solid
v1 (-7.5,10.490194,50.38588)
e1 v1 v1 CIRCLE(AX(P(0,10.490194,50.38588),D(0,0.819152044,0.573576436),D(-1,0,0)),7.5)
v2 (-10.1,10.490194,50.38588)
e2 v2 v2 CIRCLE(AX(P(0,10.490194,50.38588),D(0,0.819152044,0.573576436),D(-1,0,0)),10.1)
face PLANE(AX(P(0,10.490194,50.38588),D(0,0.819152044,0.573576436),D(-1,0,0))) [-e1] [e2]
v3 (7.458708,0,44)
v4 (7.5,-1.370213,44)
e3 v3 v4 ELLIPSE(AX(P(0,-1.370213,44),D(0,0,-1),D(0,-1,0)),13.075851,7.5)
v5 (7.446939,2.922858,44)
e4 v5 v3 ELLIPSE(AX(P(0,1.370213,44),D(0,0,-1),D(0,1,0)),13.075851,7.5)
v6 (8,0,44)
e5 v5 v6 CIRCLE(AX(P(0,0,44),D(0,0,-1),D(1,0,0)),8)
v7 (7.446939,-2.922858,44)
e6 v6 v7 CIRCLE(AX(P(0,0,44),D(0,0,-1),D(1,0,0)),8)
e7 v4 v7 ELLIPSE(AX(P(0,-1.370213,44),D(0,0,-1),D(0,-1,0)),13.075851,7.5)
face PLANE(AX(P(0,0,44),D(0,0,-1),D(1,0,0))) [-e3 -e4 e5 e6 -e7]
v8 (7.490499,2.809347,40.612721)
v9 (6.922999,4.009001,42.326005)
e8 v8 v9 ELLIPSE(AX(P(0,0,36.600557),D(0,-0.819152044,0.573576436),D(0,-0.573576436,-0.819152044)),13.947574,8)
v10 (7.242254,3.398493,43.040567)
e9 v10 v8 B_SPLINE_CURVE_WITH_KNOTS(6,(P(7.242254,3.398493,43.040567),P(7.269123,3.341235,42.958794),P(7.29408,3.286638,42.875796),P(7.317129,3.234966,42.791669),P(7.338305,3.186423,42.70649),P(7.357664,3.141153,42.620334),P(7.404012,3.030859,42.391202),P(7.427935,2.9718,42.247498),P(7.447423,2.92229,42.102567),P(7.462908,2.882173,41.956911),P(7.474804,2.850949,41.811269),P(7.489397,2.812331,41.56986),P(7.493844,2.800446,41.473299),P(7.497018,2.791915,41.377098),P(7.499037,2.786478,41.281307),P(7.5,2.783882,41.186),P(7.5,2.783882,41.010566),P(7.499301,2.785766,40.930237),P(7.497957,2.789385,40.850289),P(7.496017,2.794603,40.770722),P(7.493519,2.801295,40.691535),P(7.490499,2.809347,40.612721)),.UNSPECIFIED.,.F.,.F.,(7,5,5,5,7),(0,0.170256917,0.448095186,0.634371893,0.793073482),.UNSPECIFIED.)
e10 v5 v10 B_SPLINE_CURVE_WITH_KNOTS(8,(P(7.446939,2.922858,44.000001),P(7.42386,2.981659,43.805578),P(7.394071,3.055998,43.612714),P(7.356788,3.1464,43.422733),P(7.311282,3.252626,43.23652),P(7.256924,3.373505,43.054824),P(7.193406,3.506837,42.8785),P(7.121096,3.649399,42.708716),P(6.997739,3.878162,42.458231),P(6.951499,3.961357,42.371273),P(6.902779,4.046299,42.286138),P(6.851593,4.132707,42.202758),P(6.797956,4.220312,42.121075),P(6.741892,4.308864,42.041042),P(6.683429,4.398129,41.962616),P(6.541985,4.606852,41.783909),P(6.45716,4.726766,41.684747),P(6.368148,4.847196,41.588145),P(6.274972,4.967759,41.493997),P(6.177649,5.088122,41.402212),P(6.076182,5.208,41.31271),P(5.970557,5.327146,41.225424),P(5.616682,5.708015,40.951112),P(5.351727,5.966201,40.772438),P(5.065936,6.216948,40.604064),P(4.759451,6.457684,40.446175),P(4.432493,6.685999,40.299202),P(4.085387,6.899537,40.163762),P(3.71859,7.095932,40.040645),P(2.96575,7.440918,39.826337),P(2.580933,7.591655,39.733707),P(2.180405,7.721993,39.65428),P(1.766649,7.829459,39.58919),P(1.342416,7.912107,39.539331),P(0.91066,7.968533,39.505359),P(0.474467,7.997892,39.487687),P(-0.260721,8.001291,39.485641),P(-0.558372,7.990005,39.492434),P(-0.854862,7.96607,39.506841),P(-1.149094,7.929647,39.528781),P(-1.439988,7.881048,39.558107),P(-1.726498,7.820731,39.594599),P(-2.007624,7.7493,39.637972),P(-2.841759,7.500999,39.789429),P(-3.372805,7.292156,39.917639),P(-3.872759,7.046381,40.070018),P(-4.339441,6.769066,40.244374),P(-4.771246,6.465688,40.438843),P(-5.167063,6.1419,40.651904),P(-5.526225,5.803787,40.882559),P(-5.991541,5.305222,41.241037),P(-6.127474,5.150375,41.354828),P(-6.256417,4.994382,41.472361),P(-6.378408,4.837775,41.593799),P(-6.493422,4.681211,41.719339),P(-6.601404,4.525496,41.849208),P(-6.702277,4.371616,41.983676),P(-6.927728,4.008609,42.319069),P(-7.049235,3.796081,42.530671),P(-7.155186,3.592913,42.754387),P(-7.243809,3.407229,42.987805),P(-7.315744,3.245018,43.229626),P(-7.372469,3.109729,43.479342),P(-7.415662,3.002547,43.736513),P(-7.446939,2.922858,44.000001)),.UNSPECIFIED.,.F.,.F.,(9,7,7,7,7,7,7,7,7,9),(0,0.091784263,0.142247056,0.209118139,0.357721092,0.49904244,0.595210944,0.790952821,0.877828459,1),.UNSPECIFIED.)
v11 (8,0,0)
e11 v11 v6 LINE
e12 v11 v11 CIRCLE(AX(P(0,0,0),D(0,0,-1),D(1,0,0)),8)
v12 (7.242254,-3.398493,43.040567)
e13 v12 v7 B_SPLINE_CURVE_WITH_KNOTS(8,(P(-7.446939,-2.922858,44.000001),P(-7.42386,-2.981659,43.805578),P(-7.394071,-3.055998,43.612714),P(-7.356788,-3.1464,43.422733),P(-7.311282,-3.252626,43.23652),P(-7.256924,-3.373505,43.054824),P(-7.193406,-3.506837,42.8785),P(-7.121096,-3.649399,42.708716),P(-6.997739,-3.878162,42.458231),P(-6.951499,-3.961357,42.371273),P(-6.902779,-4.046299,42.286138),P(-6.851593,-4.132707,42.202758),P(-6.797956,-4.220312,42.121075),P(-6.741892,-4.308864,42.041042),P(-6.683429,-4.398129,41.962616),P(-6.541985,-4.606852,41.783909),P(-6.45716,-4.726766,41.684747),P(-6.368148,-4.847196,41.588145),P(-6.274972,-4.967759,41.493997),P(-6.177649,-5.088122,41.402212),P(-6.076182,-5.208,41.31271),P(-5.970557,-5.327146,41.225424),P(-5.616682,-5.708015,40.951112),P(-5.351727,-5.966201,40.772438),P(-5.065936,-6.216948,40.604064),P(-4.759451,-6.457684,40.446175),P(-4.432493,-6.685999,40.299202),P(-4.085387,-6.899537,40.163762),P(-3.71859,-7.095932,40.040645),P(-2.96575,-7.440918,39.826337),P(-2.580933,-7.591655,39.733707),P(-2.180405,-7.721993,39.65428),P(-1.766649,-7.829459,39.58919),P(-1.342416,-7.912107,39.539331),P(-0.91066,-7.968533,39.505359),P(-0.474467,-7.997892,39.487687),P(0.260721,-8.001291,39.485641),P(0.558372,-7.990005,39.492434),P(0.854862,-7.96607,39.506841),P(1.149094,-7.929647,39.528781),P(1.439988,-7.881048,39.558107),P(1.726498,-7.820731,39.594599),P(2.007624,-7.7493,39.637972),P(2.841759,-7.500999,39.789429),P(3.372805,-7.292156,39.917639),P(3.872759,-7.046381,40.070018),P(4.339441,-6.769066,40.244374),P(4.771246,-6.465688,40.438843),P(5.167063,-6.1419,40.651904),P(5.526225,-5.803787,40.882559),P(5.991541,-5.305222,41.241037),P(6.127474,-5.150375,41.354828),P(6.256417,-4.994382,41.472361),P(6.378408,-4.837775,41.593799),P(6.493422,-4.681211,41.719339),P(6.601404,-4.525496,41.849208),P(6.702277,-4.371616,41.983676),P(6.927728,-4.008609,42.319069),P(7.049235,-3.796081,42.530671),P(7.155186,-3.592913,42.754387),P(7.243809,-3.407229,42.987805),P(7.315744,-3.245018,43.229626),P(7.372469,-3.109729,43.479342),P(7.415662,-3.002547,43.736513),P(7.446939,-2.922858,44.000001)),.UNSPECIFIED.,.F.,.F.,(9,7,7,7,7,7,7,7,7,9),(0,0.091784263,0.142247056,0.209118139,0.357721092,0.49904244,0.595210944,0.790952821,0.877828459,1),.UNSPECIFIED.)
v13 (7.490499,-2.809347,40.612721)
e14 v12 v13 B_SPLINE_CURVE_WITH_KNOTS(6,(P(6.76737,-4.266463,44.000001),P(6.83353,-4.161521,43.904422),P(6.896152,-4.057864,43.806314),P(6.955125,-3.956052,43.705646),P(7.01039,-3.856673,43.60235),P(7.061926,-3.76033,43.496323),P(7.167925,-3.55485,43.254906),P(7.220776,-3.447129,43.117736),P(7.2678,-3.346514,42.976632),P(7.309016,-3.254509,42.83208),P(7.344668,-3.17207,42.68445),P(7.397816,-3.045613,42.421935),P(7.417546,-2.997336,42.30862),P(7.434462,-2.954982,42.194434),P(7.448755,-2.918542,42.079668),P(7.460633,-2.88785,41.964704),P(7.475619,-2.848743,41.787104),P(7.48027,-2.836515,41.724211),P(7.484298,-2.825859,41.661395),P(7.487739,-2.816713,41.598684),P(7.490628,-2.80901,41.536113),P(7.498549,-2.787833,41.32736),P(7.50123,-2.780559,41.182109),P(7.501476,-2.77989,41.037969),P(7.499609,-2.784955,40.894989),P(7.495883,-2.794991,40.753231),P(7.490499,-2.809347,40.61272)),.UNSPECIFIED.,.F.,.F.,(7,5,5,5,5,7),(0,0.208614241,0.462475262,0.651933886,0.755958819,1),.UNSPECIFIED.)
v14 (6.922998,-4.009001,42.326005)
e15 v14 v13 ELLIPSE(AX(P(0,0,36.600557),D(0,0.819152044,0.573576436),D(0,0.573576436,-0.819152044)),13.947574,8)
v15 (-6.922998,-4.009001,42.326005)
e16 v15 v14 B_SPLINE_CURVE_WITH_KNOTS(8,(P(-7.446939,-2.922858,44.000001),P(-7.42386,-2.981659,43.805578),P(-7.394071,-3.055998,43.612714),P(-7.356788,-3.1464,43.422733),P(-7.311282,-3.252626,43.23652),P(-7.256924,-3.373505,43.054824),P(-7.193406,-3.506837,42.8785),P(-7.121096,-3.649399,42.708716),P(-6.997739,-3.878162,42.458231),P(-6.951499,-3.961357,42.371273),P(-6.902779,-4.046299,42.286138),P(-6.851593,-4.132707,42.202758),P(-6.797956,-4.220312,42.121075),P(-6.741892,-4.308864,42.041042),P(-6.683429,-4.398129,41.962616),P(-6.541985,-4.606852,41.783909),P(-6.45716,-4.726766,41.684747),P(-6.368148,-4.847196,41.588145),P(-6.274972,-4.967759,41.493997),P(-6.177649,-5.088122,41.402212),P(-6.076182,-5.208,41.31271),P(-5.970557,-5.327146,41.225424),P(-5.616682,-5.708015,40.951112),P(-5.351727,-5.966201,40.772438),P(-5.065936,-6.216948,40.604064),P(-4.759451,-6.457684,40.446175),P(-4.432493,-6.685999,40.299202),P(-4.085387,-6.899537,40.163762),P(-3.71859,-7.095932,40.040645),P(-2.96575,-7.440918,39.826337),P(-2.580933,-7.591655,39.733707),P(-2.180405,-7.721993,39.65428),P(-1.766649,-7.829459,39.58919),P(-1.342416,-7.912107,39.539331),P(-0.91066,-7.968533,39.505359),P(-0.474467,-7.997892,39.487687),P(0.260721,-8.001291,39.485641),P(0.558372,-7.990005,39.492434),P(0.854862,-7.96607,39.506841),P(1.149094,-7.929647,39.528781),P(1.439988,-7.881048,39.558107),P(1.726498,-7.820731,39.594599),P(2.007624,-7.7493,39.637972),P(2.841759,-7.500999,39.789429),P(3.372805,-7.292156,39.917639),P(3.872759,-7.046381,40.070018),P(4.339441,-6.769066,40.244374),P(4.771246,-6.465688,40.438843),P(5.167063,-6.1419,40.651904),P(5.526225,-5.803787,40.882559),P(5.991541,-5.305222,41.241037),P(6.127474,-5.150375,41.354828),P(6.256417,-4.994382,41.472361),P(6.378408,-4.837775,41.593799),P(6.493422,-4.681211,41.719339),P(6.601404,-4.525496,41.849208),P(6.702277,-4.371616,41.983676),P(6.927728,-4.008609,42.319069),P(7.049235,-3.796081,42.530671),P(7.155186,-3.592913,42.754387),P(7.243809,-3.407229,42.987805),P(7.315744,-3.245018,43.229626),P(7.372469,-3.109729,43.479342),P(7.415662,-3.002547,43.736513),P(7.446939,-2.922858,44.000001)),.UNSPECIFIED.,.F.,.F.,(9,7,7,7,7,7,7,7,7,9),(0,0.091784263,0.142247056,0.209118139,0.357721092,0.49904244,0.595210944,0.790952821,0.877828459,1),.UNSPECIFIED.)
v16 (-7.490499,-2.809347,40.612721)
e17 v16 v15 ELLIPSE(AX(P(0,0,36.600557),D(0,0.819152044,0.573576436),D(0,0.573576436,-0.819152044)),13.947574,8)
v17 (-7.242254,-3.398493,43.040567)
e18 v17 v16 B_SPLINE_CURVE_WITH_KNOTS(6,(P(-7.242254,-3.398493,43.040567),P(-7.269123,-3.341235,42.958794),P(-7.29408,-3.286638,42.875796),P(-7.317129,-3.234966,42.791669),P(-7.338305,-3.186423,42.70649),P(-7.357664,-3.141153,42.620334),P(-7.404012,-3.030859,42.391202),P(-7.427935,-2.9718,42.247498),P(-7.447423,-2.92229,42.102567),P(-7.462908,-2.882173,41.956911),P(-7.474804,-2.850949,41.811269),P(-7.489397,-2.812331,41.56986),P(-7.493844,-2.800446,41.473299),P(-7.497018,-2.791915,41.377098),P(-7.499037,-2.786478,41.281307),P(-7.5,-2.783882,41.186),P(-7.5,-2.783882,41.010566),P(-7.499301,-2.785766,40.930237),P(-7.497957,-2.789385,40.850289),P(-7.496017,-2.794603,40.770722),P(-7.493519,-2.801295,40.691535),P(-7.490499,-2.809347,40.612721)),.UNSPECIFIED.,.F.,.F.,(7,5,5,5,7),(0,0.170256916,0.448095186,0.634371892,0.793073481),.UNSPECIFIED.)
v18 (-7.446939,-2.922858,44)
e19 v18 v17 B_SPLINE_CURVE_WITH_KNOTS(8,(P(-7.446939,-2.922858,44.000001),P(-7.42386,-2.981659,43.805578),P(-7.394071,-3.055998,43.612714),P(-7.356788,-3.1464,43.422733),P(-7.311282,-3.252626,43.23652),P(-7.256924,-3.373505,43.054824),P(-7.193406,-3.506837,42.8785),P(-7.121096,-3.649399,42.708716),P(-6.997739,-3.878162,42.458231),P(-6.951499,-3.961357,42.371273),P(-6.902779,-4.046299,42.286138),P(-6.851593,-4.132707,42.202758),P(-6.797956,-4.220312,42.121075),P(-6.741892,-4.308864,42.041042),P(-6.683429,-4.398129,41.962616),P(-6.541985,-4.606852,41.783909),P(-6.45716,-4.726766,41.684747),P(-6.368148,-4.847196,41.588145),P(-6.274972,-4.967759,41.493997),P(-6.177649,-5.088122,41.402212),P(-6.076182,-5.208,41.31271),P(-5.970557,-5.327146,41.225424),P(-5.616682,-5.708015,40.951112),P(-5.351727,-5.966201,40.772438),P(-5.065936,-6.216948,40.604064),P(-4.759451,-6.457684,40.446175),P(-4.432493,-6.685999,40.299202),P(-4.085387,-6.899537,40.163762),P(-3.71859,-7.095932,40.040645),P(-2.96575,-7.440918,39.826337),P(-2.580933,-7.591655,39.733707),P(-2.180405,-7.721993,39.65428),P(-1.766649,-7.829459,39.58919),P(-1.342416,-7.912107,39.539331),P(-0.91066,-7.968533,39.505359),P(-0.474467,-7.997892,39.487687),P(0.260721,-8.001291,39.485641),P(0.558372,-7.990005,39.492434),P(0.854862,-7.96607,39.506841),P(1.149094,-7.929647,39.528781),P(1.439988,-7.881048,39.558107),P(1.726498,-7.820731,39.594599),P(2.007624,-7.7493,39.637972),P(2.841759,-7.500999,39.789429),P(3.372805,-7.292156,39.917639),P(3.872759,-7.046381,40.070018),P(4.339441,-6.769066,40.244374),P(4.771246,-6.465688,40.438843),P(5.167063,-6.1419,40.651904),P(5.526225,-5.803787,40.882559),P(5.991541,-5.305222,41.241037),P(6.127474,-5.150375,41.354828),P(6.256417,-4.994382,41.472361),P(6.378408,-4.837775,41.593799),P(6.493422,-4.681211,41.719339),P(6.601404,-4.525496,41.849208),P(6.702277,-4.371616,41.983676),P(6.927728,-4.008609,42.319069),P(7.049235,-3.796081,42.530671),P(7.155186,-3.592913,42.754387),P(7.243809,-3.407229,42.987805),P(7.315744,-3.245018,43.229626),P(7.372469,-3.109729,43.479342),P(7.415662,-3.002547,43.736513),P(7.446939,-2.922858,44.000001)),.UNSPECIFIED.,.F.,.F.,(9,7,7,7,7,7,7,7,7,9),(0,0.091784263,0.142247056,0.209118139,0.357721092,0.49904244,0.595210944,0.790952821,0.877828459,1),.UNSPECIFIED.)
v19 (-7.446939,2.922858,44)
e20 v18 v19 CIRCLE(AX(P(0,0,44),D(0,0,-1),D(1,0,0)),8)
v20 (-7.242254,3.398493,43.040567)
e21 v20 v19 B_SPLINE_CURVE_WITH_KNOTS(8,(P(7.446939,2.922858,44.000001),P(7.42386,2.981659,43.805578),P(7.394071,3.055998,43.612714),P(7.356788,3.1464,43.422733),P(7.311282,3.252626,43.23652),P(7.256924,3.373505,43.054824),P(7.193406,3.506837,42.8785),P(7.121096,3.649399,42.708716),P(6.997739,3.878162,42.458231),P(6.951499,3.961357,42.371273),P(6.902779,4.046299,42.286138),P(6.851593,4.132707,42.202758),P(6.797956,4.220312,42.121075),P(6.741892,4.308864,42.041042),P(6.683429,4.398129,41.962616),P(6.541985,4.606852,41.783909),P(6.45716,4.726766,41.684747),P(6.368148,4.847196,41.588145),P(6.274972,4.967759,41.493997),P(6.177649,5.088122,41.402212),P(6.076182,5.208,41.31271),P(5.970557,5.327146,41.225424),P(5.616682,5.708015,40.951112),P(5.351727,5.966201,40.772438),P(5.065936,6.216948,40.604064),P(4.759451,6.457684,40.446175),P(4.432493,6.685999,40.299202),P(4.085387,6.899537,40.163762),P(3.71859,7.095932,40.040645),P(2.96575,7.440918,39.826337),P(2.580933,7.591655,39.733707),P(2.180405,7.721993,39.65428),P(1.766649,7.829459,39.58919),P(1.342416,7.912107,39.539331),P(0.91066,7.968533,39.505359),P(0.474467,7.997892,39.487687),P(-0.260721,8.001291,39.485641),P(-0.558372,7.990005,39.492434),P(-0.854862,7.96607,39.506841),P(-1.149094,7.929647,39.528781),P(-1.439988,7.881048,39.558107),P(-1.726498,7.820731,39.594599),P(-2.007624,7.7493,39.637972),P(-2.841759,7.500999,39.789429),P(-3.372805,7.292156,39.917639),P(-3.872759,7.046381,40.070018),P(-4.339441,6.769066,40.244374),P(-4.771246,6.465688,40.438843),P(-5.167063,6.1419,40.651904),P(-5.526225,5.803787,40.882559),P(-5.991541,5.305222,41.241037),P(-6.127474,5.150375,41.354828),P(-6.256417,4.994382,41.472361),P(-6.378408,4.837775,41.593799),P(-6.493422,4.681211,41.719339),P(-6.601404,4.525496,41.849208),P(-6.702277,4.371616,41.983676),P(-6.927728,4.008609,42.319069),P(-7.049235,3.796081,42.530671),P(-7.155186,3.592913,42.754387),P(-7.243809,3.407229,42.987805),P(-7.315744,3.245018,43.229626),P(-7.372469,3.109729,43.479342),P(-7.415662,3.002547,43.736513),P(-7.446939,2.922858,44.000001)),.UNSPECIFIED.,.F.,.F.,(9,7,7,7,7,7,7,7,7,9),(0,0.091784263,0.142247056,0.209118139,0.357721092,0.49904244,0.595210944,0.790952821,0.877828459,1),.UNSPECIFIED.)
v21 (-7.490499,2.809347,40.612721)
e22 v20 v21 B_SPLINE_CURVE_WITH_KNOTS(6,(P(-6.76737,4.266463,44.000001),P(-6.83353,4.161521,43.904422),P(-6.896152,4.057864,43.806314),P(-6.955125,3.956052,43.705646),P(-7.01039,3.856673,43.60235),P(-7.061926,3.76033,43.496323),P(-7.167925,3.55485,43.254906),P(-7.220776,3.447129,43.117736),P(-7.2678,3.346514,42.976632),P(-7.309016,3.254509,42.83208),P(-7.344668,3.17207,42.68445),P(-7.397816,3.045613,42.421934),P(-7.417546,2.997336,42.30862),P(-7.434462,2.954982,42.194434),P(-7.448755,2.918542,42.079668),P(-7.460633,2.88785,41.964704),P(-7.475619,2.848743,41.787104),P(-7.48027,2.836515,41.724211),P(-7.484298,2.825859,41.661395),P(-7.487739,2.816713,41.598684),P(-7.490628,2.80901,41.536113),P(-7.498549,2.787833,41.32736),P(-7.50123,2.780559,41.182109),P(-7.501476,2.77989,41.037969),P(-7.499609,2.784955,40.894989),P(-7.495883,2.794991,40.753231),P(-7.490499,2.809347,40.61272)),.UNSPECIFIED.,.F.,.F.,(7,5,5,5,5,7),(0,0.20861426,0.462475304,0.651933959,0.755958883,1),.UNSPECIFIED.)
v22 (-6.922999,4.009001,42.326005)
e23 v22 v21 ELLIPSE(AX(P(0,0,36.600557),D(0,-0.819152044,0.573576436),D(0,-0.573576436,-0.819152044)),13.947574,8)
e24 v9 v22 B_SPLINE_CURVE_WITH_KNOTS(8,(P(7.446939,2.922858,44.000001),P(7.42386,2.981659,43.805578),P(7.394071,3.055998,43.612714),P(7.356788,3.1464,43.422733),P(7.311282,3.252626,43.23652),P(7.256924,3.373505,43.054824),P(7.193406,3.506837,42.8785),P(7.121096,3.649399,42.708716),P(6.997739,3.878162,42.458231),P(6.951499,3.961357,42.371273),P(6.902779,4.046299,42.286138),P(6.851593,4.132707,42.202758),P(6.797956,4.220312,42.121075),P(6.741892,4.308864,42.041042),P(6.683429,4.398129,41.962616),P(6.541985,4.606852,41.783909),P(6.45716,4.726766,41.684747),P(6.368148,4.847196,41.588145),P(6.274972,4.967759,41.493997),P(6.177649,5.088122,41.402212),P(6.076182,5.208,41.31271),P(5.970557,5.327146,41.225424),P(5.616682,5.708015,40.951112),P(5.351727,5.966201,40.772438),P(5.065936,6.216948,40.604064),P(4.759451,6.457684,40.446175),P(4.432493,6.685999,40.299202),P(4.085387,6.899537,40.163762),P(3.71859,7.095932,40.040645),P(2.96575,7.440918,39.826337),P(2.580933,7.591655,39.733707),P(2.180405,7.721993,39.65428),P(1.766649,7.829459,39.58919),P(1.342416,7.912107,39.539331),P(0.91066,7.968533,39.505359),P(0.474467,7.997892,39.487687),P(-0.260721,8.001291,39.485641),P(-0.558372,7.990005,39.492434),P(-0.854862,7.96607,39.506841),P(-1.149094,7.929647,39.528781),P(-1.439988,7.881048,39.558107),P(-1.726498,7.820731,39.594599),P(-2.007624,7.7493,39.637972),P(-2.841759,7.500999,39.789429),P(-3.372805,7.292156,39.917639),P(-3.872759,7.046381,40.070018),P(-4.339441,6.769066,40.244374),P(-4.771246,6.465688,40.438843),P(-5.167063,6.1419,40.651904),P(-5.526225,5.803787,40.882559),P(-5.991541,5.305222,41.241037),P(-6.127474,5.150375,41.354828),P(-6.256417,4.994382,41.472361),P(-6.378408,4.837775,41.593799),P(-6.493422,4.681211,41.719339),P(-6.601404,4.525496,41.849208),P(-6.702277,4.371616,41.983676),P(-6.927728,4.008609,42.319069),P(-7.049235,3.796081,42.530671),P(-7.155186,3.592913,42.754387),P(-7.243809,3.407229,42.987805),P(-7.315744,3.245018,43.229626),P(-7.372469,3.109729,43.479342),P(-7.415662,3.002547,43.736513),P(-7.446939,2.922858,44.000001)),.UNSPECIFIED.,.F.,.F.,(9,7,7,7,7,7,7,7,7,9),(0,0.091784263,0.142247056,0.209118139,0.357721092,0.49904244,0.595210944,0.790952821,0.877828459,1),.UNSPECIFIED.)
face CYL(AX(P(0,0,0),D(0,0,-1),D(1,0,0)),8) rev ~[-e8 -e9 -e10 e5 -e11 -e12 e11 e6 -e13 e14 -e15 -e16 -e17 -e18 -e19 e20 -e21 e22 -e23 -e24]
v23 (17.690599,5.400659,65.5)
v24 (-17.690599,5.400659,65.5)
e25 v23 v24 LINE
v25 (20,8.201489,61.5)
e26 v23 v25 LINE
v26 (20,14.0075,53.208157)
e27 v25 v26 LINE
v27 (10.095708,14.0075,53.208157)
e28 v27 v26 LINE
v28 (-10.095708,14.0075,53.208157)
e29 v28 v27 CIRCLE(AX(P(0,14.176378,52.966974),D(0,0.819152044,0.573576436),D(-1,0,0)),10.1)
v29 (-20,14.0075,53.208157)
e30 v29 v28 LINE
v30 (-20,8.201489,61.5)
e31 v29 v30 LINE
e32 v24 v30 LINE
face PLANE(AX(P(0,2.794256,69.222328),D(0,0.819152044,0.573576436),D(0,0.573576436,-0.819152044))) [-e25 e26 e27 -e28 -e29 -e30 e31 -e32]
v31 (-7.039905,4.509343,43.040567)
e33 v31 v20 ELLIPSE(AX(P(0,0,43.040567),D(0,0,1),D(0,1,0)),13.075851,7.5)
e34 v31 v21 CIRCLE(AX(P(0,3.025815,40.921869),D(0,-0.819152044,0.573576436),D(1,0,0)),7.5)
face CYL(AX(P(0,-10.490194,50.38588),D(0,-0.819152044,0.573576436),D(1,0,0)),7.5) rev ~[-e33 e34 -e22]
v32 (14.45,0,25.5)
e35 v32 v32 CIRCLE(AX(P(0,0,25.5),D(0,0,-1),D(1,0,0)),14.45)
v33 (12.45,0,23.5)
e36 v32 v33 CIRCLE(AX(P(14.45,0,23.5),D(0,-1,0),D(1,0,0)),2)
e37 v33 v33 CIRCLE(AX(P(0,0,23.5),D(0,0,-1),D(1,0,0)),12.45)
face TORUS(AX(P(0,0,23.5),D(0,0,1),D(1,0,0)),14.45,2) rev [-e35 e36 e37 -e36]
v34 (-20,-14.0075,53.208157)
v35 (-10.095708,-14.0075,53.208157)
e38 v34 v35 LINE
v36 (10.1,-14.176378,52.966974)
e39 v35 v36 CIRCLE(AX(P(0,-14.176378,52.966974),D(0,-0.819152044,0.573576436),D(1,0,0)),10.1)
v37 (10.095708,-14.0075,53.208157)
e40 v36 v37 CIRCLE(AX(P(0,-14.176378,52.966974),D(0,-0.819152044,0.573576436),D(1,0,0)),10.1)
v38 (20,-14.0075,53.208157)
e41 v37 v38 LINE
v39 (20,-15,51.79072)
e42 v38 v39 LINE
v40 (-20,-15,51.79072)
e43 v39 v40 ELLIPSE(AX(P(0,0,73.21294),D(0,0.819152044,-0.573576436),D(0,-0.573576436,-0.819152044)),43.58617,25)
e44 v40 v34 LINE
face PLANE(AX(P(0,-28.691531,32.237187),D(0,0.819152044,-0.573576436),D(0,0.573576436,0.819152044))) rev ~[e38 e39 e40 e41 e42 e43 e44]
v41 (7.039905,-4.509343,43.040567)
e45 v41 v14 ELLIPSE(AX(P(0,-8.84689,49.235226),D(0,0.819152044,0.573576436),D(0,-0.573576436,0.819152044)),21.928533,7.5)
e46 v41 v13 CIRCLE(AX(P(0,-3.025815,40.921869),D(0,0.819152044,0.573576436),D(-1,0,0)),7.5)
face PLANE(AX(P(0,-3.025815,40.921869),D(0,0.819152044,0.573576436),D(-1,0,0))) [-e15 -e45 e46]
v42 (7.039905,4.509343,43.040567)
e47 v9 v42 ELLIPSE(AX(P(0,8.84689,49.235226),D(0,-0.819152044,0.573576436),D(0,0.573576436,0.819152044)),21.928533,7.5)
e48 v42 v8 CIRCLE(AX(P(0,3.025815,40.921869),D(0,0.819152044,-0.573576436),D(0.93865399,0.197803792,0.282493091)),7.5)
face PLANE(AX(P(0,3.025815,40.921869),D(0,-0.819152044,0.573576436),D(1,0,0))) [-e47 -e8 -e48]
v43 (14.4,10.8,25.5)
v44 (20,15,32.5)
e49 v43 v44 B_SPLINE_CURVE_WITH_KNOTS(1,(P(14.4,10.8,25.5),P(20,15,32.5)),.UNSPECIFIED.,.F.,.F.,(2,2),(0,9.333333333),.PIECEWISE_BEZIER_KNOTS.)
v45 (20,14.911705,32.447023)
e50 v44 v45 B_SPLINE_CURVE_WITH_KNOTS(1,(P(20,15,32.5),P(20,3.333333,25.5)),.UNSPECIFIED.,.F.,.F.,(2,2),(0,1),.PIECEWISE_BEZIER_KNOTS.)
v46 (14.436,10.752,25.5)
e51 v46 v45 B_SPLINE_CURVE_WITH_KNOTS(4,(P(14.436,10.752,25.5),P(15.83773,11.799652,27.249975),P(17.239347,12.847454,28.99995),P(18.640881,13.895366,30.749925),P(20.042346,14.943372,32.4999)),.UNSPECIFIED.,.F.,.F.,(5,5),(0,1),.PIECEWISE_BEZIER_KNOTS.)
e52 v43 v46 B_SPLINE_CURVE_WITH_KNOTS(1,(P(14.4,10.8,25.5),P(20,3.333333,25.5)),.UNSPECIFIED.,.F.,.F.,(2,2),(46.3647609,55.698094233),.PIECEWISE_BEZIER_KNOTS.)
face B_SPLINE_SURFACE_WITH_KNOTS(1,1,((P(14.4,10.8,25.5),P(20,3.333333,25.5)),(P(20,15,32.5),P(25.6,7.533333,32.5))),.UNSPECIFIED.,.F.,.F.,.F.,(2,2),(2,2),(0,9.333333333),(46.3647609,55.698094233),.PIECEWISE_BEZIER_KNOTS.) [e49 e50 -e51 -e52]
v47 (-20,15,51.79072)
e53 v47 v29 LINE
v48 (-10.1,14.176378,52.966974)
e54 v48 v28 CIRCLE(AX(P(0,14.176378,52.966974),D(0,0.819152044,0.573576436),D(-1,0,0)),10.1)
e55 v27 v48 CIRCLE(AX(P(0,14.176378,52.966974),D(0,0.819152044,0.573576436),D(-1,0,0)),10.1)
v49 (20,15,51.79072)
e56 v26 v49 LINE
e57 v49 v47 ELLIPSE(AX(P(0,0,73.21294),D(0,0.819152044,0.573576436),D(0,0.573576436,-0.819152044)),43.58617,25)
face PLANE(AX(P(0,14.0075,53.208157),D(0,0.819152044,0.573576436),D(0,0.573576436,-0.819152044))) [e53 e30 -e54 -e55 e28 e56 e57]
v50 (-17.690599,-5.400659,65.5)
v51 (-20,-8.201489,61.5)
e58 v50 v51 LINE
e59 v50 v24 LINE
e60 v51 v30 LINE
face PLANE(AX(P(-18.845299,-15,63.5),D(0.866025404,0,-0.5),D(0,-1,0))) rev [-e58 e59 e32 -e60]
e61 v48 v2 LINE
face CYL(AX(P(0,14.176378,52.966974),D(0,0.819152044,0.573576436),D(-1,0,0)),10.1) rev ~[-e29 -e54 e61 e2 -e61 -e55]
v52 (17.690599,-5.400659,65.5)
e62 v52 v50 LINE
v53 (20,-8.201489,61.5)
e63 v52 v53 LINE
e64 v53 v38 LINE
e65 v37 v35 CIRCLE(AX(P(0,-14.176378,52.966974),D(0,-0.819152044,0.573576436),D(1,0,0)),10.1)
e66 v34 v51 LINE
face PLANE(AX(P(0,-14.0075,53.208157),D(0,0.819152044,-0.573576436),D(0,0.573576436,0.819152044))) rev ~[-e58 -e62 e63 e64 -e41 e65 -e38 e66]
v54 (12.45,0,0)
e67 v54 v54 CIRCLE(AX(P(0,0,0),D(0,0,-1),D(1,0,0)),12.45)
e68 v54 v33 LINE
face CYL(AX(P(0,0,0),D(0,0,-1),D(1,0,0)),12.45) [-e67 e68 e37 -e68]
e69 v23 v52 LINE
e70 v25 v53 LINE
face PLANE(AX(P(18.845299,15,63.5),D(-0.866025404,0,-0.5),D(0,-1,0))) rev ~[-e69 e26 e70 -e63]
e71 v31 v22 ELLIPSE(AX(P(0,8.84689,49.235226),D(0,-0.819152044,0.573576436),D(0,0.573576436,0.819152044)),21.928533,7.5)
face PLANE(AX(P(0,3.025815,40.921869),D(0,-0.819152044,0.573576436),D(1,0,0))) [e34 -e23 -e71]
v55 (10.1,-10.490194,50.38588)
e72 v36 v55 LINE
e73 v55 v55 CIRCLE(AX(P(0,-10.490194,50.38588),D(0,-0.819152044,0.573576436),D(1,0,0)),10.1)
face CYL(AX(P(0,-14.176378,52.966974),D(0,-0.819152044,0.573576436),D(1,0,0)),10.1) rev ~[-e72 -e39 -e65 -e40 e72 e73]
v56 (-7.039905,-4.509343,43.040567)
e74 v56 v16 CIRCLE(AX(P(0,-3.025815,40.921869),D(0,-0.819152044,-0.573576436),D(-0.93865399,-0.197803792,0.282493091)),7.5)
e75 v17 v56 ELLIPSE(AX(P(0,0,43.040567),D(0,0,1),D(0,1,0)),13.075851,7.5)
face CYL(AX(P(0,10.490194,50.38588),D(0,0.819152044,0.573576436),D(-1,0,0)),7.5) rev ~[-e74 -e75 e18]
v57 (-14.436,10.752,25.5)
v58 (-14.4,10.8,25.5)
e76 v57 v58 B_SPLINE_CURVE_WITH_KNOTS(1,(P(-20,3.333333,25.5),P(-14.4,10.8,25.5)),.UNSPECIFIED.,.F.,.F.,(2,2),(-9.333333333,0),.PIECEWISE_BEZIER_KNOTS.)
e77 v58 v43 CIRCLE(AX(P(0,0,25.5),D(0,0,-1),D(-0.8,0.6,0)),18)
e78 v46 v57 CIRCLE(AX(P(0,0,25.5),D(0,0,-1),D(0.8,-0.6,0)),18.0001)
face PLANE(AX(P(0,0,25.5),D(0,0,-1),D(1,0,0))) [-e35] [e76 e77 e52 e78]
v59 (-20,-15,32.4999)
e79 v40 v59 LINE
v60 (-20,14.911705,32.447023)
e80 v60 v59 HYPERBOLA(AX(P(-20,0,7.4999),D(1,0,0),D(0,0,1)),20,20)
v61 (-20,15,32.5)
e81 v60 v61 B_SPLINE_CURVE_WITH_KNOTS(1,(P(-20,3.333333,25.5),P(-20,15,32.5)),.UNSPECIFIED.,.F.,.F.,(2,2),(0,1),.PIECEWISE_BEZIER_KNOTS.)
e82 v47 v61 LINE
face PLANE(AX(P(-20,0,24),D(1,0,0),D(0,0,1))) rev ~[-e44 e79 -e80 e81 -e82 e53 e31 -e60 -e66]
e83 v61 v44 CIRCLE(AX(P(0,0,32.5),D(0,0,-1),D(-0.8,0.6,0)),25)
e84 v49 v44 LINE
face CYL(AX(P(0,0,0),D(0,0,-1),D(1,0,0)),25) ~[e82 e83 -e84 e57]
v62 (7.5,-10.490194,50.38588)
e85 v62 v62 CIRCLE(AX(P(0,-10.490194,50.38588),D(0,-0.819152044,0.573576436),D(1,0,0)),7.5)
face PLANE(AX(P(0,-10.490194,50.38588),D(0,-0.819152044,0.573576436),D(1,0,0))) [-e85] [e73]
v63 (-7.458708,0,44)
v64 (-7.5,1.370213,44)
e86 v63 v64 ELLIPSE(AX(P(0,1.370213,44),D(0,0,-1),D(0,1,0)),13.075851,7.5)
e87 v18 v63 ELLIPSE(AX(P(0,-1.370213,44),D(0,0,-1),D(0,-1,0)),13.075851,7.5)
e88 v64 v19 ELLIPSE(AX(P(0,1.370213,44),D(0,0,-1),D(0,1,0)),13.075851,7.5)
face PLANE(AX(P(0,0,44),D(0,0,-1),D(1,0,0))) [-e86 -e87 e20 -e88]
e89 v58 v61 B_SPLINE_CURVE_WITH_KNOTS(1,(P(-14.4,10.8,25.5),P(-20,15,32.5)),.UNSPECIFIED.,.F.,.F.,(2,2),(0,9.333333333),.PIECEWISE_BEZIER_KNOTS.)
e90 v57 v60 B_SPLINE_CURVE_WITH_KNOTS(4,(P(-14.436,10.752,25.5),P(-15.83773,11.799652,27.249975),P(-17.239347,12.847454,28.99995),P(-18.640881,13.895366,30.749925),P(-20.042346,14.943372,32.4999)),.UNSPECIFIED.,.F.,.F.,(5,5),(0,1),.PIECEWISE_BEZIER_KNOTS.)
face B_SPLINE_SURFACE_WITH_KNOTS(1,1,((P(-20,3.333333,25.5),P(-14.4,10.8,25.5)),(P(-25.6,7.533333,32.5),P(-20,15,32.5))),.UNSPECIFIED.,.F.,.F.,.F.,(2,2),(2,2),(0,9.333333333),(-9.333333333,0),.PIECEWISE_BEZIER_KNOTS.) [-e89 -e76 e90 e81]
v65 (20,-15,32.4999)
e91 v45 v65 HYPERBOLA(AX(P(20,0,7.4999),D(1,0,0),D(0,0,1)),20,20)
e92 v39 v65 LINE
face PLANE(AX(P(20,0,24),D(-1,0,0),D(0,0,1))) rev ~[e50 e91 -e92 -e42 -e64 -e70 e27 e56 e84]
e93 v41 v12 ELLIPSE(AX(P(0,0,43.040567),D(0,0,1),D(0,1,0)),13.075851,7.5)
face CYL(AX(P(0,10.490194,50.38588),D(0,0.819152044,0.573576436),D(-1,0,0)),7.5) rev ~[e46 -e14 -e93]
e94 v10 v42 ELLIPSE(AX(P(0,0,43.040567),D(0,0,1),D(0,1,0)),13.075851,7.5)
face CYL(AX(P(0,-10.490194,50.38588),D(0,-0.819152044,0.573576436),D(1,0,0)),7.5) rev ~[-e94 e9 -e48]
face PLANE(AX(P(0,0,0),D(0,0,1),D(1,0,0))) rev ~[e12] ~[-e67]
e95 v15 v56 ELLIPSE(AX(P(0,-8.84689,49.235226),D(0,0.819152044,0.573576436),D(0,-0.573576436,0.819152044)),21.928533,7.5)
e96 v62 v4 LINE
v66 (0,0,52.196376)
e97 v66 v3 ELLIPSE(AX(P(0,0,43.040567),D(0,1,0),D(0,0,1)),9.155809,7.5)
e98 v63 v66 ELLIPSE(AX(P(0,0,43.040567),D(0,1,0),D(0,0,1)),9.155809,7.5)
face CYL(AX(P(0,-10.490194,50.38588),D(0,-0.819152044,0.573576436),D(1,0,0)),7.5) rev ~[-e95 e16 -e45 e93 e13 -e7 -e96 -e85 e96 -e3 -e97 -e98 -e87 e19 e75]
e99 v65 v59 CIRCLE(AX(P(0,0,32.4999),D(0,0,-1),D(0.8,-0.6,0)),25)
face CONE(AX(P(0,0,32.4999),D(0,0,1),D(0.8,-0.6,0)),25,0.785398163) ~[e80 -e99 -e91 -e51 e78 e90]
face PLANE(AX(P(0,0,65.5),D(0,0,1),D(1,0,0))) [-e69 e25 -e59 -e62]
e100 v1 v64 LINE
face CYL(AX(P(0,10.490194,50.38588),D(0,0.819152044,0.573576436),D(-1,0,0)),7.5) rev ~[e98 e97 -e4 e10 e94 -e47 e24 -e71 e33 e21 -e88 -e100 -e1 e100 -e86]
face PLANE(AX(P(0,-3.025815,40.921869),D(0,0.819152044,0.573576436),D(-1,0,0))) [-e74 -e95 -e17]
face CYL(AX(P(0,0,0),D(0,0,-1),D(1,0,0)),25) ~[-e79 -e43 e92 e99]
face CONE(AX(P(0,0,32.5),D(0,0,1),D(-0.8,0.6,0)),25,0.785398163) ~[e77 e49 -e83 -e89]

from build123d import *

# Parameters (mm, degrees)
F0_R        = 25
F1_DEPTH    = 65.5
F2_R        = 8
F3_DEPTH    = 44
F4_W        = 17.7049817399
F4_H        = 63.7933180105
F4_W_2      = 20.9798936745
F4_H_2      = 49.4306737048
F5_DEPTH    = 49.3
F6_C1_SIZE2 = 2.3094010768
F6_C1_SIZE  = 4
F6_C2_SIZE2 = 4
F6_C2_SIZE  = 2.3094010768
F7_R        = 27.6347360806
F7_R_2      = 12.45
F8_DEPTH    = 25.5
F9_R        = 2
F11_DEPTH   = 44.3
F12_C1_SIZE = 7
F12_C2_SIZE = 6.9999
F13_R       = 10.1
F14_DEPTH   = 4.5
F15_R       = 10.1
F16_DEPTH   = 4.5
F17_R       = 7.5
F18_DEPTH   = 16.5
F19_R       = 7.5
F20_DEPTH   = 16.5


# Not quite as in the source:
# - a fillet or chamfer is up to 0.001 mm smaller than in the source, because OpenCascade refuses the exact size


with BuildPart() as f1:
    # F0 (on Top) → F1 (new body)
    with BuildSketch(Plane.XY):
        Circle(F0_R)
    extrude(amount=F1_DEPTH)

    # F2 (on face) → F3 (cut)
    with BuildSketch(Plane(origin=(0, 0, 0), x_dir=(1, 0, 0), z_dir=(0, 0, -1))):
        Circle(F2_R)
    extrude(amount=-F3_DEPTH, mode=Mode.SUBTRACT)

    # F4 (on Front) → F5 (cut, symmetric)
    with BuildSketch(Plane.XZ):
        with Locations((28.8524908699, 55.8966590053)):
            Rectangle(F4_W, F4_H)
        with Locations((-30.4899468372, 48.7153368524)):
            Rectangle(F4_W_2, F4_H_2)
    extrude(amount=F5_DEPTH, both=True, mode=Mode.SUBTRACT)

    # F6: chamfer of 4 x 2.3094010768 on 2 edges, made by hand

    # F6_c1
    f6_c1_edges = [f1.edges().sort_by_distance(p)[0] for p in [
        (20, 0, 65.5),
    ]]
    f6_c1_side = f1.faces().sort_by_distance((20, 0, 65.4538119785))[0]
    chamfer(f6_c1_edges, length=F6_C1_SIZE, length2=F6_C1_SIZE2, reference=f6_c1_side)

    # F6_c2
    f6_c2_edges = [f1.edges().sort_by_distance(p)[0] for p in [
        (-20, 0, 65.5),
    ]]
    f6_c2_side = f1.faces().sort_by_distance((-19.9538119785, 0, 65.5))[0]
    chamfer(f6_c2_edges, length=F6_C2_SIZE, length2=F6_C2_SIZE2, reference=f6_c2_side)

    # F7 (on face) → F8 (cut)
    with BuildSketch(Plane(origin=(0, 0, 0), x_dir=(1, 0, 0), z_dir=(0, 0, -1))):
        Circle(F7_R)
        Circle(F7_R_2, mode=Mode.SUBTRACT)
    extrude(amount=-F8_DEPTH, mode=Mode.SUBTRACT)

    # F9
    f9_edges = [f1.edges().sort_by_distance(p)[0] for p in [
        (-12.45, 0, 25.5),
    ]]
    fillet(f9_edges, radius=F9_R)

    # F10 (on Right) → F11 (cut, symmetric)
    with BuildSketch(Plane.YZ):
        Polygon((2.7942564781, 69.2223283856), (14.0074999573, 53.2081570616), (27.8284827581, 33.4697480234), (27.8284827581, 71.2105557323), align=None)
        Polygon((-28.691531344, 32.2371869058), (-14.0074999573, 53.2081570616), (-2.0273737507, 70.3175504242), (-27.1908640862, 71.7121362686), align=None)
    extrude(amount=F11_DEPTH, both=True, mode=Mode.SUBTRACT)

    # F12: chamfer of 7 on 3 edges, made by hand

    # F12_c1
    f12_c1_edges = [f1.edges().sort_by_distance(p)[0] for p in [
        (0, 25, 25.5),
    ]]
    chamfer(f12_c1_edges, length=F12_C1_SIZE)

    # F12_c2 (size 7 in the source; OpenCascade refuses exactly that, so slightly less here)
    f12_c2_edges = [f1.edges().sort_by_distance(p)[0] for p in [
        (0, -25, 25.5),
    ]]
    chamfer(f12_c2_edges, length=F12_C2_SIZE)

    # F13 (on face) → F14 (cut)
    with BuildSketch(Plane(origin=(0, -34.3988298284, 24.0863199514), x_dir=(1, 0, 0), z_dir=(0, -0.8191520443, 0.5735764364))):
        with Locations((0, 35.2567682304)):
            Circle(F13_R)
    extrude(amount=-F14_DEPTH, mode=Mode.SUBTRACT)

    # F15 (on face) → F16 (cut)
    with BuildSketch(Plane(origin=(0, 34.3988298284, 24.0863199514), x_dir=(-1, 0, 0), z_dir=(0, 0.8191520443, 0.5735764364))):
        with Locations((0, 35.2567682304)):
            Circle(F15_R)
    extrude(amount=-F16_DEPTH, mode=Mode.SUBTRACT)

    # F17 (on face) → F18 (cut)
    with BuildSketch(Plane(origin=(0, 30.7126456291, 21.5052259879), x_dir=(-1, 0, 0), z_dir=(0, 0.8191520443, 0.5735764364))):
        with Locations((0, 35.2567682304)):
            Circle(F17_R)
    extrude(amount=-F18_DEPTH, mode=Mode.SUBTRACT)

    # F19 (on face) → F20 (cut)
    with BuildSketch(Plane(origin=(0, -30.7126456291, 21.5052259879), x_dir=(1, 0, 0), z_dir=(0, -0.8191520443, 0.5735764364))):
        with Locations((0, 35.2567682304)):
            Circle(F19_R)
    extrude(amount=-F20_DEPTH, mode=Mode.SUBTRACT)


solid = f1.part
